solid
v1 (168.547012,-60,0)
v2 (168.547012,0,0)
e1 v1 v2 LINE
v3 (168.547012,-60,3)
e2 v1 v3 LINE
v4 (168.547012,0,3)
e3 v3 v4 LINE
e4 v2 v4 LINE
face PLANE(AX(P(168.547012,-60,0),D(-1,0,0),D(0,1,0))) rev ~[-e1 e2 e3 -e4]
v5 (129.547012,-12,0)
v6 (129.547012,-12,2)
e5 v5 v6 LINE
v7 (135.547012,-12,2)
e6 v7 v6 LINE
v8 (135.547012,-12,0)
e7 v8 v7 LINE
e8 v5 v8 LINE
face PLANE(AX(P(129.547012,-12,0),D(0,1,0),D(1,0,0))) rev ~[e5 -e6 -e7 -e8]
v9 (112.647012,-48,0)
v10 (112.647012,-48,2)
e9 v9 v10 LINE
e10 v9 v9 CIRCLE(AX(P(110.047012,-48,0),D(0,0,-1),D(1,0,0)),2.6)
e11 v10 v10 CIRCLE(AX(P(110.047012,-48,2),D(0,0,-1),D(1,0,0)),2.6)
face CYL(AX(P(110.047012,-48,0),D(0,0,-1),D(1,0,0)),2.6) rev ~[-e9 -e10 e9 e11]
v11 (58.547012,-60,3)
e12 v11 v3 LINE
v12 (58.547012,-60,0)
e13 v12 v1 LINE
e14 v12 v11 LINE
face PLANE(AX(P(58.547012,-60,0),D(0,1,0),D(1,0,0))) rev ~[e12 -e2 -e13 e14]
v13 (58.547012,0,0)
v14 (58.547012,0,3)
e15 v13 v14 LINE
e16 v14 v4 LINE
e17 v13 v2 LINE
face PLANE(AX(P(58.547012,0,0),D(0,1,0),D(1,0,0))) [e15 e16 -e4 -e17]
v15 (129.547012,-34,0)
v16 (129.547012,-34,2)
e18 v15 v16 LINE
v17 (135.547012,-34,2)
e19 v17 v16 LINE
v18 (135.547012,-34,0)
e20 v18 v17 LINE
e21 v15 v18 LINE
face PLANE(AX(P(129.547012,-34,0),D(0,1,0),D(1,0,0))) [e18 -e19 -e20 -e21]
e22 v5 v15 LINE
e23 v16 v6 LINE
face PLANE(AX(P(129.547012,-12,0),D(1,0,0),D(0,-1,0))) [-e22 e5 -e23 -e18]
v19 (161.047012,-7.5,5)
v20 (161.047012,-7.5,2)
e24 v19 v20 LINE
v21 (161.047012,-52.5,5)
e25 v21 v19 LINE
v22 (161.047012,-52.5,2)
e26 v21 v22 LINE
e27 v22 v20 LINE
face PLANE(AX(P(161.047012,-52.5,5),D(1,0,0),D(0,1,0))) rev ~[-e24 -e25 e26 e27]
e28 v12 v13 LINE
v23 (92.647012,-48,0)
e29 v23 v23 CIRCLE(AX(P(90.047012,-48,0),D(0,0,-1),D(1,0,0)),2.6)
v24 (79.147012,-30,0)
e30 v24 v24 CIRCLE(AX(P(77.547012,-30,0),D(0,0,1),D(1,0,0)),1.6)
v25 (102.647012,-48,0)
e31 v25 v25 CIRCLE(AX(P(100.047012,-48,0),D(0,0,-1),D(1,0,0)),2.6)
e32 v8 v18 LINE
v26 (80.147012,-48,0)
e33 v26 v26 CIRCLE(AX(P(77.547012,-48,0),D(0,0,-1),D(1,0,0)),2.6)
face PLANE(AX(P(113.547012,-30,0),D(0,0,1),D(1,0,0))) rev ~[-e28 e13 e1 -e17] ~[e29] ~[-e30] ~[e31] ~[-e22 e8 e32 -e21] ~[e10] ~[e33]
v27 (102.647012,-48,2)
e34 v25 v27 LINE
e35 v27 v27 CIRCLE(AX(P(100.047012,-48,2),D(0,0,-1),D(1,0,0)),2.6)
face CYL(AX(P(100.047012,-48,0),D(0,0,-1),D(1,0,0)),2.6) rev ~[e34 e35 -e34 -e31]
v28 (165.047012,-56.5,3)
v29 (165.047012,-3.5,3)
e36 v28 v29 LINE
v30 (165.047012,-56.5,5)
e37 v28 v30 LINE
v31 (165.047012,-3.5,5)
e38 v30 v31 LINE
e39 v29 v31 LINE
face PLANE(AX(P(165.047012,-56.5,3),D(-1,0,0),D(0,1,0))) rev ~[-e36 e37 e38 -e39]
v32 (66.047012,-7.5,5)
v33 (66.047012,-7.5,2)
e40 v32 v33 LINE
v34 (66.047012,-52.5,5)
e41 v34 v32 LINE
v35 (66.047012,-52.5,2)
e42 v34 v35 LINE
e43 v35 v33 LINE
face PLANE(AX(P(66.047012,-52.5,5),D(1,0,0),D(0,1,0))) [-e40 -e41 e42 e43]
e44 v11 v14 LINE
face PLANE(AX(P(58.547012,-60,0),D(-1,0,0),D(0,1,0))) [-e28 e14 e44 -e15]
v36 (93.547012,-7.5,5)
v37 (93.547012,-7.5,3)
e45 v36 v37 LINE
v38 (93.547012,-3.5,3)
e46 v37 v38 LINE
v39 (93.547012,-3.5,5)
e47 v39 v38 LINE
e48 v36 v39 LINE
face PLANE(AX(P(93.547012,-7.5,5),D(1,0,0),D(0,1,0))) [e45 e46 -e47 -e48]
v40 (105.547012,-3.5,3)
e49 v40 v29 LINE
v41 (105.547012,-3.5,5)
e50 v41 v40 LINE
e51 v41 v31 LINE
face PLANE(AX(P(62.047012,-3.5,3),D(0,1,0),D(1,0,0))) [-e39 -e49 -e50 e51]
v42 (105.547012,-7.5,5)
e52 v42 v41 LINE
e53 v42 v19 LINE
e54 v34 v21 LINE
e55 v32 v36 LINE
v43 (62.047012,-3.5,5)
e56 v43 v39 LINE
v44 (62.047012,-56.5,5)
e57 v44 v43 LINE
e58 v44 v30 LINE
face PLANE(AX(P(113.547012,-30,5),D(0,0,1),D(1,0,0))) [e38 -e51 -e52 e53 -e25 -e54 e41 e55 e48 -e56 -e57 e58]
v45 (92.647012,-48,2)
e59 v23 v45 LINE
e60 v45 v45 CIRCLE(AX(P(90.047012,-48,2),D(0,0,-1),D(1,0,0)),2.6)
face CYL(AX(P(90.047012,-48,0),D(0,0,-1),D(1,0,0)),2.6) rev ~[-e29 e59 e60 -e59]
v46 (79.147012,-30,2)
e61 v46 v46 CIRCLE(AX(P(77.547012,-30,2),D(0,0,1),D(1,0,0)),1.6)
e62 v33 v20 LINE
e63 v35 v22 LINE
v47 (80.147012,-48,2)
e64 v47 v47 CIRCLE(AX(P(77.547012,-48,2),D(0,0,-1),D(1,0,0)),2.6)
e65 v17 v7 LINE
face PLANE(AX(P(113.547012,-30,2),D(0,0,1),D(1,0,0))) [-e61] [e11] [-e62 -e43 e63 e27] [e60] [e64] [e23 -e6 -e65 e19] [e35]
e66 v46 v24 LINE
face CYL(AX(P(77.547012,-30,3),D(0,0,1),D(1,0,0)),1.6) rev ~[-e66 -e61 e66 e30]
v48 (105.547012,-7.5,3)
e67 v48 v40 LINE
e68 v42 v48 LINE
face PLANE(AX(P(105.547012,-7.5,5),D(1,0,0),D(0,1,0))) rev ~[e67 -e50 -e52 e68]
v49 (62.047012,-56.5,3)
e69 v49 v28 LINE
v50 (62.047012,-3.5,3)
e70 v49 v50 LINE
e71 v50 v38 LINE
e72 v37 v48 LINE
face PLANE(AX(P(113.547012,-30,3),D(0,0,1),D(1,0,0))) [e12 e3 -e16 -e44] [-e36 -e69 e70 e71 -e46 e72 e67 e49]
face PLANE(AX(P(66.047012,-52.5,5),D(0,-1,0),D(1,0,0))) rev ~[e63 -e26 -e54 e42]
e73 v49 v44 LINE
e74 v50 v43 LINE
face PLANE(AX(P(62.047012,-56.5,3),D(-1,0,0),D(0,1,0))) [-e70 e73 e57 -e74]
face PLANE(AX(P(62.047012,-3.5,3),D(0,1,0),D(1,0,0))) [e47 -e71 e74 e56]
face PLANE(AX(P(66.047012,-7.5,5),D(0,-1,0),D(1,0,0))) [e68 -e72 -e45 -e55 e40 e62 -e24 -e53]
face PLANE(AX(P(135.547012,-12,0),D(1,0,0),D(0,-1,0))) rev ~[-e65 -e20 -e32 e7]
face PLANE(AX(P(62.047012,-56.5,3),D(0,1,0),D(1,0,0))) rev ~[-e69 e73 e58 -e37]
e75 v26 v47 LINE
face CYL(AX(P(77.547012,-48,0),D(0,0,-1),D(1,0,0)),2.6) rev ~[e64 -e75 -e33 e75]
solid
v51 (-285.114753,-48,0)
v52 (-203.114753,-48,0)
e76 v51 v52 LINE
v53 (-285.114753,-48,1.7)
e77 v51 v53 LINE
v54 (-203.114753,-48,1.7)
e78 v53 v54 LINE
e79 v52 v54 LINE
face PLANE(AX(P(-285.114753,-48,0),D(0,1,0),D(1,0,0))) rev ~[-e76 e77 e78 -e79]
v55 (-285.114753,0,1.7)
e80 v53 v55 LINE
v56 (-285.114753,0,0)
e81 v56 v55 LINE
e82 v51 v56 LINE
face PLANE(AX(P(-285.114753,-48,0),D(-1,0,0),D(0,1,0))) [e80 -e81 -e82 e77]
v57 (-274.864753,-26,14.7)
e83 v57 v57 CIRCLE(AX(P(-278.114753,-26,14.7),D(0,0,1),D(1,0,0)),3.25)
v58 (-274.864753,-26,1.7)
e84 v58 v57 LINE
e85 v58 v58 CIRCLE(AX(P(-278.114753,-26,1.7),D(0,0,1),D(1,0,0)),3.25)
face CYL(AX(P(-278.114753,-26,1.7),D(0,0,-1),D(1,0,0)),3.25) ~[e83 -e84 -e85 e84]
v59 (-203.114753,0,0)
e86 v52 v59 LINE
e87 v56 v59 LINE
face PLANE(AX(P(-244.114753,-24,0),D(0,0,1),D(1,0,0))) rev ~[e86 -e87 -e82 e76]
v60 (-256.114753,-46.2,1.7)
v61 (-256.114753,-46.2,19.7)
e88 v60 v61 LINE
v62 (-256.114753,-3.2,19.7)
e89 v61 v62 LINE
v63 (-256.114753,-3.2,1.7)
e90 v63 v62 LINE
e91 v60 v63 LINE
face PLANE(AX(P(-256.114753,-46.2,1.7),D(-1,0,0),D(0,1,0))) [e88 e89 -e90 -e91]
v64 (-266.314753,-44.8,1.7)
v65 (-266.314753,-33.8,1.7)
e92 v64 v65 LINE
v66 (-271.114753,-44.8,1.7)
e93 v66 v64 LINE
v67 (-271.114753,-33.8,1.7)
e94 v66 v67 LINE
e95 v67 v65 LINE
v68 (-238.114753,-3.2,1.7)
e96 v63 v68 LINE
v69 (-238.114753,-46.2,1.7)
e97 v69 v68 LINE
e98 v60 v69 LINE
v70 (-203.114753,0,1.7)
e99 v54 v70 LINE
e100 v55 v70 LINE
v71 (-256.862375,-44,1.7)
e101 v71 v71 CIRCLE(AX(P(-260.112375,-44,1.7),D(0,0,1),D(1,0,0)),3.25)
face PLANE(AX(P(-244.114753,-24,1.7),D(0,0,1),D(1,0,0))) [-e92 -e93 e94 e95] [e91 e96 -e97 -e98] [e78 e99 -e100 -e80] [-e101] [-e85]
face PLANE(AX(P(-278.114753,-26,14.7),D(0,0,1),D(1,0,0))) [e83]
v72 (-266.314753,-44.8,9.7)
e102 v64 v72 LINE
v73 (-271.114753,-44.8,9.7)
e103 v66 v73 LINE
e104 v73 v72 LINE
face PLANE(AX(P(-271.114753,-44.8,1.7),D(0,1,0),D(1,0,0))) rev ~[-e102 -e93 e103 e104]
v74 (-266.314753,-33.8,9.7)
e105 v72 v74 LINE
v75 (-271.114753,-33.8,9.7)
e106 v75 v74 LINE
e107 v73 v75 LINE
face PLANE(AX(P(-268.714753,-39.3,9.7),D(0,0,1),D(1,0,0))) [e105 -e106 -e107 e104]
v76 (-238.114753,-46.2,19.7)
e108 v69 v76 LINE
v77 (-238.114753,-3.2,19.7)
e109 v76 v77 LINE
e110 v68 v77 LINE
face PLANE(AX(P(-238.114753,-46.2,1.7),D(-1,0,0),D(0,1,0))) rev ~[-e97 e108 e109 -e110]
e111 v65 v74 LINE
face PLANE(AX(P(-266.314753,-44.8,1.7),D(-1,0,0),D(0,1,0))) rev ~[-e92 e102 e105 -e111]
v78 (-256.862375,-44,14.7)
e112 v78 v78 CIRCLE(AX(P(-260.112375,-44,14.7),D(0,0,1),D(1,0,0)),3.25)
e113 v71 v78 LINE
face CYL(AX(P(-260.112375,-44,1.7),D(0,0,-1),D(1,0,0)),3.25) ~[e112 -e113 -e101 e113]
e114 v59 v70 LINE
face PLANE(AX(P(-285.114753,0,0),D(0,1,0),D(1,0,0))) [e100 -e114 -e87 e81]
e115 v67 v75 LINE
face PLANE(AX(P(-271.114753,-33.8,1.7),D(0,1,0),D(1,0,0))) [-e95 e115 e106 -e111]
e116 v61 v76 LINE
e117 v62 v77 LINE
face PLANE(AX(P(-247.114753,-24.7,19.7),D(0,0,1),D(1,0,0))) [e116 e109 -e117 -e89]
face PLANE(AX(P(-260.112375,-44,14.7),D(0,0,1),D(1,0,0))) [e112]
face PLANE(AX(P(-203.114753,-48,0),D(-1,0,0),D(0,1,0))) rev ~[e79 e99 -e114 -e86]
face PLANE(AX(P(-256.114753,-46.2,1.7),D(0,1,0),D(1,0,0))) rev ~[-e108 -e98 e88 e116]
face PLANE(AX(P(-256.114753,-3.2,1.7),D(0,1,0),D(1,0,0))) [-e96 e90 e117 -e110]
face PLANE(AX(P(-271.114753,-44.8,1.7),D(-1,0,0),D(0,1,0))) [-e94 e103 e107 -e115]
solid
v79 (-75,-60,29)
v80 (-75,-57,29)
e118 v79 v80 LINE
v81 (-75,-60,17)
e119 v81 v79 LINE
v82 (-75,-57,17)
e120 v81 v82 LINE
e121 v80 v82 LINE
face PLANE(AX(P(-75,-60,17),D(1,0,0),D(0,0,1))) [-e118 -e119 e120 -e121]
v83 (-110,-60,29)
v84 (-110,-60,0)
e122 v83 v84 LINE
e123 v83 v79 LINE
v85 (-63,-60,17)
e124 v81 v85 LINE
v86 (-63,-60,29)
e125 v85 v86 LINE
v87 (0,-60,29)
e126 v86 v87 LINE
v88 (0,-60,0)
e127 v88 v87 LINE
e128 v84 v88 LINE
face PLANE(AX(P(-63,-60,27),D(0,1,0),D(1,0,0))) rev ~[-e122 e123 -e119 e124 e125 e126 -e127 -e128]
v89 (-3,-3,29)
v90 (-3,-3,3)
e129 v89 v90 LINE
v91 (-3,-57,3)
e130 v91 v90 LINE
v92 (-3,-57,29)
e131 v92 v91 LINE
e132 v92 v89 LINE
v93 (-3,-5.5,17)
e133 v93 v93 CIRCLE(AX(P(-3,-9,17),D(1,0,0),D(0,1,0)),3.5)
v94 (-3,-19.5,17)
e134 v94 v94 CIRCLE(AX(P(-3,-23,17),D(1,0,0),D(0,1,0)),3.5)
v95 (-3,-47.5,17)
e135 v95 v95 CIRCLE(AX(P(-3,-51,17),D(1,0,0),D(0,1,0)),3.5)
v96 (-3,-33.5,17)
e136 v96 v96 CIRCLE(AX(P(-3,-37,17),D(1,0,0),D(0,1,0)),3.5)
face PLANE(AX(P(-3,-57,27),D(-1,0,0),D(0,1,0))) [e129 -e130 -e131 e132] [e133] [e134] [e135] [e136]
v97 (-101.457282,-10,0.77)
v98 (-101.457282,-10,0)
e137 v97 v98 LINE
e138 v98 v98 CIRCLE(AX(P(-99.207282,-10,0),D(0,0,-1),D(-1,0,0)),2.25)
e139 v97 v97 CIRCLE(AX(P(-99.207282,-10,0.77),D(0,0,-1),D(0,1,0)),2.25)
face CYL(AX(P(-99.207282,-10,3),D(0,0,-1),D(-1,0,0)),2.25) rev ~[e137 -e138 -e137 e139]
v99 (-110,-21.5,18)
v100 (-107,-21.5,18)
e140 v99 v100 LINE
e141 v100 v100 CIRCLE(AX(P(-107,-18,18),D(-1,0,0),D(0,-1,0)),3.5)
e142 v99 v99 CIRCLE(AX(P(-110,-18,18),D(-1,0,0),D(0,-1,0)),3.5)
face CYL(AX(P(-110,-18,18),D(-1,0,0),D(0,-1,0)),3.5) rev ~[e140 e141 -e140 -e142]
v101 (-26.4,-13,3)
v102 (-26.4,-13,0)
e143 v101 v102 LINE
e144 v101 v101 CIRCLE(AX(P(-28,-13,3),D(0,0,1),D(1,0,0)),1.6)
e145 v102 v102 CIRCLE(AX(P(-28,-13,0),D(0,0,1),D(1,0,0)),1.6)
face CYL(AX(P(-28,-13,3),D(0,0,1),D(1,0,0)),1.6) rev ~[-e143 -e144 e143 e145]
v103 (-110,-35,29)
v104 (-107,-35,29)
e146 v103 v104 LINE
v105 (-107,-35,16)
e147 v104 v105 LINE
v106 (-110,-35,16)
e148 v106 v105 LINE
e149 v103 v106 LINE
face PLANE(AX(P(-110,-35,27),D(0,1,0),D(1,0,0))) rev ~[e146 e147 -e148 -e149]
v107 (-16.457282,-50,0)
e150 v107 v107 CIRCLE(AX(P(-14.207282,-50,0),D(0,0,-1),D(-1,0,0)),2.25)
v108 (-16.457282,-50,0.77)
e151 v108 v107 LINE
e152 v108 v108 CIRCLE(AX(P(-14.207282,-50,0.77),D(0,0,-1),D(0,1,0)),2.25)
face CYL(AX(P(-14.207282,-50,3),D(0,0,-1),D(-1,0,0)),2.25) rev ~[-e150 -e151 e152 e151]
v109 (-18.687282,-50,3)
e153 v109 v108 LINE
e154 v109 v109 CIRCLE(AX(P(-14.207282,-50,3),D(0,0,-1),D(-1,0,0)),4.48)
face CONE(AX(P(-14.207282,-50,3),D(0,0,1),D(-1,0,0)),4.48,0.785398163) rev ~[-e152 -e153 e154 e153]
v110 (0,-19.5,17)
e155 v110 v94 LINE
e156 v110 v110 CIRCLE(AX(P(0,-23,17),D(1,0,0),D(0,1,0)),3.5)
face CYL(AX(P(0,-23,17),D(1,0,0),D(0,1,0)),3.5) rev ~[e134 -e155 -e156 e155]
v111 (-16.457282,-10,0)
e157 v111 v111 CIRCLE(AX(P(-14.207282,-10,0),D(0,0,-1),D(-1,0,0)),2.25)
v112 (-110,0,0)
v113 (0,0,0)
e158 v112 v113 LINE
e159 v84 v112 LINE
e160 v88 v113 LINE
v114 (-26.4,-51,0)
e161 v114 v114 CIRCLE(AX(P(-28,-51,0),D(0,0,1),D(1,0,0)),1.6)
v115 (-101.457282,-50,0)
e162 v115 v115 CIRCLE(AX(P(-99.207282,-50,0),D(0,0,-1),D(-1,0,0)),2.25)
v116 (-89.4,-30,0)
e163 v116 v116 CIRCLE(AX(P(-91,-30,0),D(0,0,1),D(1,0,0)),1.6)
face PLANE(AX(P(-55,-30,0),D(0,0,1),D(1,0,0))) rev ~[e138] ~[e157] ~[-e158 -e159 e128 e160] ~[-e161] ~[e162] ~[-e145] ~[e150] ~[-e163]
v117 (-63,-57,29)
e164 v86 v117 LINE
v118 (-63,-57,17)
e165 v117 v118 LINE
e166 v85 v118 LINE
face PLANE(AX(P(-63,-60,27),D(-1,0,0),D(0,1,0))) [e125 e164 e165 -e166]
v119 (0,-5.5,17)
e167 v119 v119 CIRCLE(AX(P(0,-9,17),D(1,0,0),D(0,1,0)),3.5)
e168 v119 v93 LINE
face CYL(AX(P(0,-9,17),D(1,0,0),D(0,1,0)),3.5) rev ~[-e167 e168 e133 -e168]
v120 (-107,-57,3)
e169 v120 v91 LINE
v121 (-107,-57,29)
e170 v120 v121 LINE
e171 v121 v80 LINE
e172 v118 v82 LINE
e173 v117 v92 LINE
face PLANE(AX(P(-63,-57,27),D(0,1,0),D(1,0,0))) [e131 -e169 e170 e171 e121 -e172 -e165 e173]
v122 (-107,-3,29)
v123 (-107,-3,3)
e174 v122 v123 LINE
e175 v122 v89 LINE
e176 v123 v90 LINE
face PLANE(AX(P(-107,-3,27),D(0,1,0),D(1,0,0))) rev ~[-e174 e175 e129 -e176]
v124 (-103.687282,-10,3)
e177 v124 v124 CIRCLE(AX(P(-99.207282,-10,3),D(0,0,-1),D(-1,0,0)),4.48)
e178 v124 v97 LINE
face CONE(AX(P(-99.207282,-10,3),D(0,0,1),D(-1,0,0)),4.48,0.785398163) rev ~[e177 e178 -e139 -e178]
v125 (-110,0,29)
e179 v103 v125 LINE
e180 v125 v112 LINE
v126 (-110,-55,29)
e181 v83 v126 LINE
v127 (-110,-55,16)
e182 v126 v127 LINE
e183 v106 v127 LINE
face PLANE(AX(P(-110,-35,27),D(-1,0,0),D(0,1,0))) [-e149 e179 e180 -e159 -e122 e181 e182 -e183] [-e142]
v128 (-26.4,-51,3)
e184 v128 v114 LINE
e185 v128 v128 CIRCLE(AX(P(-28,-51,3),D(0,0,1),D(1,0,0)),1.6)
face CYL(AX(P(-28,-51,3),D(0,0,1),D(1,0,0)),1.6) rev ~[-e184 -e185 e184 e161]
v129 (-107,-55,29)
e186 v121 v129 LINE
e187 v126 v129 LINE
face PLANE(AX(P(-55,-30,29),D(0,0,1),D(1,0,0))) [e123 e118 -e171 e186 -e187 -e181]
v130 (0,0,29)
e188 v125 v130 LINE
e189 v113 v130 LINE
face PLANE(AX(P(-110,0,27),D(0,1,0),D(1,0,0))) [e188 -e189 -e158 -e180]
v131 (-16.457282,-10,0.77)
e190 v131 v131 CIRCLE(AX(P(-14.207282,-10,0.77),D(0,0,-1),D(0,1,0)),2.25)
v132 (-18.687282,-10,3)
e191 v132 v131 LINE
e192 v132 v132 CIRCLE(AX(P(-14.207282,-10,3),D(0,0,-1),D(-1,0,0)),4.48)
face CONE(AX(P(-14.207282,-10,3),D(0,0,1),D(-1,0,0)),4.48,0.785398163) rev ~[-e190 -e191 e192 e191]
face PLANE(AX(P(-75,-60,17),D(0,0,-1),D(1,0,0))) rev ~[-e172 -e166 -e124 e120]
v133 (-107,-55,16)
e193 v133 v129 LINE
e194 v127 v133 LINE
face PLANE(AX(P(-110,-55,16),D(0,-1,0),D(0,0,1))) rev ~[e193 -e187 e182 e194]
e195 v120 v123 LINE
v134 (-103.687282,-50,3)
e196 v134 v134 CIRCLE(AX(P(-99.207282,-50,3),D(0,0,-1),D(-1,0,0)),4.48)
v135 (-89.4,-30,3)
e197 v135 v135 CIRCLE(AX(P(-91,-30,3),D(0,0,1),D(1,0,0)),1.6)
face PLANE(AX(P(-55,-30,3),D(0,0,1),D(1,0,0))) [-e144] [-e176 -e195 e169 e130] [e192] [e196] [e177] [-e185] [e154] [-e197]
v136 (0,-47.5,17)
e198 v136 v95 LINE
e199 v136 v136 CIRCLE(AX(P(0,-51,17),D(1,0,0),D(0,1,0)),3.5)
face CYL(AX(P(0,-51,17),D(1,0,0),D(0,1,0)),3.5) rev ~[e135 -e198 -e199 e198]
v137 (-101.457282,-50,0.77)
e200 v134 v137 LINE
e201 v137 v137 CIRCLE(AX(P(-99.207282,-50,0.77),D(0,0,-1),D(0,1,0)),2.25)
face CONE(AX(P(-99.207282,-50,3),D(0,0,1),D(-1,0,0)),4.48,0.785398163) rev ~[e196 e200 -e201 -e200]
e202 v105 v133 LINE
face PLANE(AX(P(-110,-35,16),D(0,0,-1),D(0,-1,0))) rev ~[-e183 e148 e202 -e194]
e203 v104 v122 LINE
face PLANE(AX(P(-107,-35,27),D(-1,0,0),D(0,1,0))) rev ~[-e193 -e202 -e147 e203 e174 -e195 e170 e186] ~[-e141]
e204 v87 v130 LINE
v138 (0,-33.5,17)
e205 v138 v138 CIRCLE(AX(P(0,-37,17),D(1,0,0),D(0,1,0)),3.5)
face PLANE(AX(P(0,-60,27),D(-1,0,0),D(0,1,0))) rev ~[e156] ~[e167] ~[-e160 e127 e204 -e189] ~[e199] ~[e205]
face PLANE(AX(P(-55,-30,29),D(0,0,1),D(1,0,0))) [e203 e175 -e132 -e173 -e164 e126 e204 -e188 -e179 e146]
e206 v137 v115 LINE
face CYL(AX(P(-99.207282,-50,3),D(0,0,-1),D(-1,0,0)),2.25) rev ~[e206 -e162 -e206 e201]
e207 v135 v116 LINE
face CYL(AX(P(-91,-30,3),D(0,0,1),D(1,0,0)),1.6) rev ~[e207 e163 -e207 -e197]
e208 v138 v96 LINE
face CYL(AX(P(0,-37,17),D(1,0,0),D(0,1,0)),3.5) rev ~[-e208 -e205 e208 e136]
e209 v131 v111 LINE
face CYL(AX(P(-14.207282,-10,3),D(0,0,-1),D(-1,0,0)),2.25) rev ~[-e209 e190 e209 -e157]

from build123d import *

# Parameters (mm, degrees)
F0_W            = 110
F0_H            = 60
F1_DEPTH        = 3
F2_W            = 110
F2_H            = 60
F2_W_2          = 104
F2_H_2          = 54
F3_DEPTH        = 24
F4_R            = 3.5
F5_DEPTH        = 25
F6_R            = 1.6
F7_DEPTH        = 25
F8_W            = 12
F8_H            = 10
F9_DEPTH        = 25
F10_R           = 3.5
F11_DEPTH       = 25
F12_DEPTH       = 2
F13_D           = 4.5
F13_CSINK_D     = 8.96
F13_CSINK_ANGLE = 90
F14_W           = 110
F14_H           = 60
F15_DEPTH       = 3
F16_R           = 1.6
F17_DEPTH       = 25
F16_W           = 103
F16_H           = 53
F18_DEPTH       = 2
F19_W           = 95
F19_H           = 45
F19_R           = 1.6
F20_DEPTH       = 3
F21_W           = 12
F21_H           = 4
F22_DEPTH       = 2
F23_R           = 2.6
F23_W           = 6
F23_H           = 22
F24_DEPTH       = 25
F25_W           = 82
F25_H           = 48
F26_DEPTH       = 1.7
F27_R           = 3.25
F28_DEPTH       = 13
F27_W           = 4.8
F27_H           = 11
F29_DEPTH       = 8
F27_W_2         = 18
F27_H_2         = 43
F30_DEPTH       = 18


# Not quite as in the source:
# - a feature names something its author has since deleted; it is built from what else it names


with BuildPart() as f1:
    # F0 (on Top) → F1 (new body)
    with BuildSketch(Plane.XY):
        with Locations((-55, -30)):
            Rectangle(F0_W, F0_H)
    extrude(amount=F1_DEPTH)

    # F2 (on face) → F3 (join)
    with BuildSketch(Plane.XY.offset(3)):
        with Locations((-55, -30)):
            Rectangle(F2_W, F2_H)
        with Locations((-55, -30)):
            Rectangle(F2_W_2, F2_H_2, mode=Mode.SUBTRACT)
    extrude(amount=F3_DEPTH)

    # F4 (on face) → F5 (cut)
    with BuildSketch(Plane(origin=(-110, 0, 0), x_dir=(0, -1, 0), z_dir=(-1, 0, 0))):
        with Locations((18, 18)):
            Circle(F4_R)
        Polygon((35, 16), (45, 16), (55, 16), (55, 27), (35, 27), align=None)
    extrude(amount=-F5_DEPTH, mode=Mode.SUBTRACT)

    # F6 (on face) → F7 (cut)
    with BuildSketch(Plane.XY.offset(3)):
        with Locations((-28, -51)):
            Circle(F6_R)
        with Locations((-28, -13)):
            Circle(F6_R)
        with Locations((-91, -30)):
            Circle(F6_R)
    extrude(amount=-F7_DEPTH, mode=Mode.SUBTRACT)

    # F8 (on face) → F9 (cut)
    with BuildSketch(Plane.XZ.offset(60)):
        with Locations((-69, 22)):
            Rectangle(F8_W, F8_H)
    extrude(amount=-F9_DEPTH, mode=Mode.SUBTRACT)

    # F10 (on face) → F11 (cut)
    with BuildSketch(Plane.YZ):
        with Locations((-51, 17)):
            Circle(F10_R)
        with Locations((-37, 17)):
            Circle(F10_R)
        with Locations((-23, 17)):
            Circle(F10_R)
        with Locations((-9, 17)):
            Circle(F10_R)
    extrude(amount=-F11_DEPTH, mode=Mode.SUBTRACT)

    # F12 (add): faces of the model
    f12_faces = [f1.faces().sort_by_distance(p)[0] for p in [
        (-61.7470035914, -58.5, 27),
        (-93.3648648649, -58.3648648649, 27),
    ]]
    extrude(f12_faces, amount=F12_DEPTH)

    # F13 (through all)
    with Locations(Plane.XY.offset(3)):
        with Locations((-99.2072820663, -10), (-99.2072820663, -50), (-14.2072820663, -50), (-14.2072820663, -10)):
            CounterSinkHole(F13_D / 2, F13_CSINK_D / 2, counter_sink_angle=F13_CSINK_ANGLE)


with BuildPart() as f15:
    # F14 (on Top) → F15 (new body)
    with BuildSketch(Plane.XY):
        with Locations((113.5470122111, -30)):
            Rectangle(F14_W, F14_H)
    extrude(amount=F15_DEPTH)

    # F16 (on face) → F17 (cut)
    with BuildSketch(Plane.XY.offset(3)):
        with Locations((77.5470122111, -30)):
            Circle(F16_R)
    extrude(amount=-F17_DEPTH, mode=Mode.SUBTRACT)

    # F16 (on face) → F18 (join)
    with BuildSketch(Plane.XY.offset(3)):
        with Locations((113.5470122111, -30)):
            Rectangle(F16_W, F16_H)
        with Locations((77.5470122111, -30)):
            Circle(F16_R, mode=Mode.SUBTRACT)
    extrude(amount=F18_DEPTH)

    # F19 (on face) → F20 (cut)
    with BuildSketch(Plane.XY.offset(5)):
        with Locations((113.5470122111, -30)):
            Rectangle(F19_W, F19_H)
        with Locations((77.5470122111, -30)):
            Circle(F19_R, mode=Mode.SUBTRACT)
    extrude(amount=-F20_DEPTH, mode=Mode.SUBTRACT)

    # F21 (on face) → F22 (cut)
    with BuildSketch(Plane.XY.offset(5)):
        with Locations((99.5470122111, -5.5)):
            Rectangle(F21_W, F21_H)
    extrude(amount=-F22_DEPTH, mode=Mode.SUBTRACT)

    # F23 (on face) → F24 (cut)
    with BuildSketch(Plane(origin=(0, 0, 0), x_dir=(1, 0, 0), z_dir=(0, 0, -1))):
        with Locations((110.0470122111, 48)):
            Circle(F23_R)
        with Locations((100.0470122111, 48)):
            Circle(F23_R)
        with Locations((90.0470122111, 48)):
            Circle(F23_R)
        with Locations((77.5470122111, 48)):
            Circle(F23_R)
        with Locations((132.5470122111, 23)):
            Rectangle(F23_W, F23_H)
    extrude(amount=-F24_DEPTH, mode=Mode.SUBTRACT)


with BuildPart() as f26:
    # F25 (on Top) → F26 (new body)
    with BuildSketch(Plane.XY):
        with Locations((-244.1147527828, -24)):
            Rectangle(F25_W, F25_H)
    extrude(amount=F26_DEPTH)

    # F27 (on face) → F28 (join)
    with BuildSketch(Plane.XY.offset(1.7)):
        with Locations((-260.112375021, -44)):
            Circle(F27_R)
        with Locations((-278.1147527828, -26)):
            Circle(F27_R)
    extrude(amount=F28_DEPTH)

    # F27 (on face) → F29 (join)
    with BuildSketch(Plane.XY.offset(1.7)):
        with Locations((-268.7147527828, -39.3)):
            Rectangle(F27_W, F27_H)
    extrude(amount=F29_DEPTH)

    # F27 (on face) → F30 (join)
    with BuildSketch(Plane.XY.offset(1.7)):
        with Locations((-247.1147527828, -24.7)):
            Rectangle(F27_W_2, F27_H_2)
    extrude(amount=F30_DEPTH)


solid = Compound([f1.part, f15.part, f26.part])
